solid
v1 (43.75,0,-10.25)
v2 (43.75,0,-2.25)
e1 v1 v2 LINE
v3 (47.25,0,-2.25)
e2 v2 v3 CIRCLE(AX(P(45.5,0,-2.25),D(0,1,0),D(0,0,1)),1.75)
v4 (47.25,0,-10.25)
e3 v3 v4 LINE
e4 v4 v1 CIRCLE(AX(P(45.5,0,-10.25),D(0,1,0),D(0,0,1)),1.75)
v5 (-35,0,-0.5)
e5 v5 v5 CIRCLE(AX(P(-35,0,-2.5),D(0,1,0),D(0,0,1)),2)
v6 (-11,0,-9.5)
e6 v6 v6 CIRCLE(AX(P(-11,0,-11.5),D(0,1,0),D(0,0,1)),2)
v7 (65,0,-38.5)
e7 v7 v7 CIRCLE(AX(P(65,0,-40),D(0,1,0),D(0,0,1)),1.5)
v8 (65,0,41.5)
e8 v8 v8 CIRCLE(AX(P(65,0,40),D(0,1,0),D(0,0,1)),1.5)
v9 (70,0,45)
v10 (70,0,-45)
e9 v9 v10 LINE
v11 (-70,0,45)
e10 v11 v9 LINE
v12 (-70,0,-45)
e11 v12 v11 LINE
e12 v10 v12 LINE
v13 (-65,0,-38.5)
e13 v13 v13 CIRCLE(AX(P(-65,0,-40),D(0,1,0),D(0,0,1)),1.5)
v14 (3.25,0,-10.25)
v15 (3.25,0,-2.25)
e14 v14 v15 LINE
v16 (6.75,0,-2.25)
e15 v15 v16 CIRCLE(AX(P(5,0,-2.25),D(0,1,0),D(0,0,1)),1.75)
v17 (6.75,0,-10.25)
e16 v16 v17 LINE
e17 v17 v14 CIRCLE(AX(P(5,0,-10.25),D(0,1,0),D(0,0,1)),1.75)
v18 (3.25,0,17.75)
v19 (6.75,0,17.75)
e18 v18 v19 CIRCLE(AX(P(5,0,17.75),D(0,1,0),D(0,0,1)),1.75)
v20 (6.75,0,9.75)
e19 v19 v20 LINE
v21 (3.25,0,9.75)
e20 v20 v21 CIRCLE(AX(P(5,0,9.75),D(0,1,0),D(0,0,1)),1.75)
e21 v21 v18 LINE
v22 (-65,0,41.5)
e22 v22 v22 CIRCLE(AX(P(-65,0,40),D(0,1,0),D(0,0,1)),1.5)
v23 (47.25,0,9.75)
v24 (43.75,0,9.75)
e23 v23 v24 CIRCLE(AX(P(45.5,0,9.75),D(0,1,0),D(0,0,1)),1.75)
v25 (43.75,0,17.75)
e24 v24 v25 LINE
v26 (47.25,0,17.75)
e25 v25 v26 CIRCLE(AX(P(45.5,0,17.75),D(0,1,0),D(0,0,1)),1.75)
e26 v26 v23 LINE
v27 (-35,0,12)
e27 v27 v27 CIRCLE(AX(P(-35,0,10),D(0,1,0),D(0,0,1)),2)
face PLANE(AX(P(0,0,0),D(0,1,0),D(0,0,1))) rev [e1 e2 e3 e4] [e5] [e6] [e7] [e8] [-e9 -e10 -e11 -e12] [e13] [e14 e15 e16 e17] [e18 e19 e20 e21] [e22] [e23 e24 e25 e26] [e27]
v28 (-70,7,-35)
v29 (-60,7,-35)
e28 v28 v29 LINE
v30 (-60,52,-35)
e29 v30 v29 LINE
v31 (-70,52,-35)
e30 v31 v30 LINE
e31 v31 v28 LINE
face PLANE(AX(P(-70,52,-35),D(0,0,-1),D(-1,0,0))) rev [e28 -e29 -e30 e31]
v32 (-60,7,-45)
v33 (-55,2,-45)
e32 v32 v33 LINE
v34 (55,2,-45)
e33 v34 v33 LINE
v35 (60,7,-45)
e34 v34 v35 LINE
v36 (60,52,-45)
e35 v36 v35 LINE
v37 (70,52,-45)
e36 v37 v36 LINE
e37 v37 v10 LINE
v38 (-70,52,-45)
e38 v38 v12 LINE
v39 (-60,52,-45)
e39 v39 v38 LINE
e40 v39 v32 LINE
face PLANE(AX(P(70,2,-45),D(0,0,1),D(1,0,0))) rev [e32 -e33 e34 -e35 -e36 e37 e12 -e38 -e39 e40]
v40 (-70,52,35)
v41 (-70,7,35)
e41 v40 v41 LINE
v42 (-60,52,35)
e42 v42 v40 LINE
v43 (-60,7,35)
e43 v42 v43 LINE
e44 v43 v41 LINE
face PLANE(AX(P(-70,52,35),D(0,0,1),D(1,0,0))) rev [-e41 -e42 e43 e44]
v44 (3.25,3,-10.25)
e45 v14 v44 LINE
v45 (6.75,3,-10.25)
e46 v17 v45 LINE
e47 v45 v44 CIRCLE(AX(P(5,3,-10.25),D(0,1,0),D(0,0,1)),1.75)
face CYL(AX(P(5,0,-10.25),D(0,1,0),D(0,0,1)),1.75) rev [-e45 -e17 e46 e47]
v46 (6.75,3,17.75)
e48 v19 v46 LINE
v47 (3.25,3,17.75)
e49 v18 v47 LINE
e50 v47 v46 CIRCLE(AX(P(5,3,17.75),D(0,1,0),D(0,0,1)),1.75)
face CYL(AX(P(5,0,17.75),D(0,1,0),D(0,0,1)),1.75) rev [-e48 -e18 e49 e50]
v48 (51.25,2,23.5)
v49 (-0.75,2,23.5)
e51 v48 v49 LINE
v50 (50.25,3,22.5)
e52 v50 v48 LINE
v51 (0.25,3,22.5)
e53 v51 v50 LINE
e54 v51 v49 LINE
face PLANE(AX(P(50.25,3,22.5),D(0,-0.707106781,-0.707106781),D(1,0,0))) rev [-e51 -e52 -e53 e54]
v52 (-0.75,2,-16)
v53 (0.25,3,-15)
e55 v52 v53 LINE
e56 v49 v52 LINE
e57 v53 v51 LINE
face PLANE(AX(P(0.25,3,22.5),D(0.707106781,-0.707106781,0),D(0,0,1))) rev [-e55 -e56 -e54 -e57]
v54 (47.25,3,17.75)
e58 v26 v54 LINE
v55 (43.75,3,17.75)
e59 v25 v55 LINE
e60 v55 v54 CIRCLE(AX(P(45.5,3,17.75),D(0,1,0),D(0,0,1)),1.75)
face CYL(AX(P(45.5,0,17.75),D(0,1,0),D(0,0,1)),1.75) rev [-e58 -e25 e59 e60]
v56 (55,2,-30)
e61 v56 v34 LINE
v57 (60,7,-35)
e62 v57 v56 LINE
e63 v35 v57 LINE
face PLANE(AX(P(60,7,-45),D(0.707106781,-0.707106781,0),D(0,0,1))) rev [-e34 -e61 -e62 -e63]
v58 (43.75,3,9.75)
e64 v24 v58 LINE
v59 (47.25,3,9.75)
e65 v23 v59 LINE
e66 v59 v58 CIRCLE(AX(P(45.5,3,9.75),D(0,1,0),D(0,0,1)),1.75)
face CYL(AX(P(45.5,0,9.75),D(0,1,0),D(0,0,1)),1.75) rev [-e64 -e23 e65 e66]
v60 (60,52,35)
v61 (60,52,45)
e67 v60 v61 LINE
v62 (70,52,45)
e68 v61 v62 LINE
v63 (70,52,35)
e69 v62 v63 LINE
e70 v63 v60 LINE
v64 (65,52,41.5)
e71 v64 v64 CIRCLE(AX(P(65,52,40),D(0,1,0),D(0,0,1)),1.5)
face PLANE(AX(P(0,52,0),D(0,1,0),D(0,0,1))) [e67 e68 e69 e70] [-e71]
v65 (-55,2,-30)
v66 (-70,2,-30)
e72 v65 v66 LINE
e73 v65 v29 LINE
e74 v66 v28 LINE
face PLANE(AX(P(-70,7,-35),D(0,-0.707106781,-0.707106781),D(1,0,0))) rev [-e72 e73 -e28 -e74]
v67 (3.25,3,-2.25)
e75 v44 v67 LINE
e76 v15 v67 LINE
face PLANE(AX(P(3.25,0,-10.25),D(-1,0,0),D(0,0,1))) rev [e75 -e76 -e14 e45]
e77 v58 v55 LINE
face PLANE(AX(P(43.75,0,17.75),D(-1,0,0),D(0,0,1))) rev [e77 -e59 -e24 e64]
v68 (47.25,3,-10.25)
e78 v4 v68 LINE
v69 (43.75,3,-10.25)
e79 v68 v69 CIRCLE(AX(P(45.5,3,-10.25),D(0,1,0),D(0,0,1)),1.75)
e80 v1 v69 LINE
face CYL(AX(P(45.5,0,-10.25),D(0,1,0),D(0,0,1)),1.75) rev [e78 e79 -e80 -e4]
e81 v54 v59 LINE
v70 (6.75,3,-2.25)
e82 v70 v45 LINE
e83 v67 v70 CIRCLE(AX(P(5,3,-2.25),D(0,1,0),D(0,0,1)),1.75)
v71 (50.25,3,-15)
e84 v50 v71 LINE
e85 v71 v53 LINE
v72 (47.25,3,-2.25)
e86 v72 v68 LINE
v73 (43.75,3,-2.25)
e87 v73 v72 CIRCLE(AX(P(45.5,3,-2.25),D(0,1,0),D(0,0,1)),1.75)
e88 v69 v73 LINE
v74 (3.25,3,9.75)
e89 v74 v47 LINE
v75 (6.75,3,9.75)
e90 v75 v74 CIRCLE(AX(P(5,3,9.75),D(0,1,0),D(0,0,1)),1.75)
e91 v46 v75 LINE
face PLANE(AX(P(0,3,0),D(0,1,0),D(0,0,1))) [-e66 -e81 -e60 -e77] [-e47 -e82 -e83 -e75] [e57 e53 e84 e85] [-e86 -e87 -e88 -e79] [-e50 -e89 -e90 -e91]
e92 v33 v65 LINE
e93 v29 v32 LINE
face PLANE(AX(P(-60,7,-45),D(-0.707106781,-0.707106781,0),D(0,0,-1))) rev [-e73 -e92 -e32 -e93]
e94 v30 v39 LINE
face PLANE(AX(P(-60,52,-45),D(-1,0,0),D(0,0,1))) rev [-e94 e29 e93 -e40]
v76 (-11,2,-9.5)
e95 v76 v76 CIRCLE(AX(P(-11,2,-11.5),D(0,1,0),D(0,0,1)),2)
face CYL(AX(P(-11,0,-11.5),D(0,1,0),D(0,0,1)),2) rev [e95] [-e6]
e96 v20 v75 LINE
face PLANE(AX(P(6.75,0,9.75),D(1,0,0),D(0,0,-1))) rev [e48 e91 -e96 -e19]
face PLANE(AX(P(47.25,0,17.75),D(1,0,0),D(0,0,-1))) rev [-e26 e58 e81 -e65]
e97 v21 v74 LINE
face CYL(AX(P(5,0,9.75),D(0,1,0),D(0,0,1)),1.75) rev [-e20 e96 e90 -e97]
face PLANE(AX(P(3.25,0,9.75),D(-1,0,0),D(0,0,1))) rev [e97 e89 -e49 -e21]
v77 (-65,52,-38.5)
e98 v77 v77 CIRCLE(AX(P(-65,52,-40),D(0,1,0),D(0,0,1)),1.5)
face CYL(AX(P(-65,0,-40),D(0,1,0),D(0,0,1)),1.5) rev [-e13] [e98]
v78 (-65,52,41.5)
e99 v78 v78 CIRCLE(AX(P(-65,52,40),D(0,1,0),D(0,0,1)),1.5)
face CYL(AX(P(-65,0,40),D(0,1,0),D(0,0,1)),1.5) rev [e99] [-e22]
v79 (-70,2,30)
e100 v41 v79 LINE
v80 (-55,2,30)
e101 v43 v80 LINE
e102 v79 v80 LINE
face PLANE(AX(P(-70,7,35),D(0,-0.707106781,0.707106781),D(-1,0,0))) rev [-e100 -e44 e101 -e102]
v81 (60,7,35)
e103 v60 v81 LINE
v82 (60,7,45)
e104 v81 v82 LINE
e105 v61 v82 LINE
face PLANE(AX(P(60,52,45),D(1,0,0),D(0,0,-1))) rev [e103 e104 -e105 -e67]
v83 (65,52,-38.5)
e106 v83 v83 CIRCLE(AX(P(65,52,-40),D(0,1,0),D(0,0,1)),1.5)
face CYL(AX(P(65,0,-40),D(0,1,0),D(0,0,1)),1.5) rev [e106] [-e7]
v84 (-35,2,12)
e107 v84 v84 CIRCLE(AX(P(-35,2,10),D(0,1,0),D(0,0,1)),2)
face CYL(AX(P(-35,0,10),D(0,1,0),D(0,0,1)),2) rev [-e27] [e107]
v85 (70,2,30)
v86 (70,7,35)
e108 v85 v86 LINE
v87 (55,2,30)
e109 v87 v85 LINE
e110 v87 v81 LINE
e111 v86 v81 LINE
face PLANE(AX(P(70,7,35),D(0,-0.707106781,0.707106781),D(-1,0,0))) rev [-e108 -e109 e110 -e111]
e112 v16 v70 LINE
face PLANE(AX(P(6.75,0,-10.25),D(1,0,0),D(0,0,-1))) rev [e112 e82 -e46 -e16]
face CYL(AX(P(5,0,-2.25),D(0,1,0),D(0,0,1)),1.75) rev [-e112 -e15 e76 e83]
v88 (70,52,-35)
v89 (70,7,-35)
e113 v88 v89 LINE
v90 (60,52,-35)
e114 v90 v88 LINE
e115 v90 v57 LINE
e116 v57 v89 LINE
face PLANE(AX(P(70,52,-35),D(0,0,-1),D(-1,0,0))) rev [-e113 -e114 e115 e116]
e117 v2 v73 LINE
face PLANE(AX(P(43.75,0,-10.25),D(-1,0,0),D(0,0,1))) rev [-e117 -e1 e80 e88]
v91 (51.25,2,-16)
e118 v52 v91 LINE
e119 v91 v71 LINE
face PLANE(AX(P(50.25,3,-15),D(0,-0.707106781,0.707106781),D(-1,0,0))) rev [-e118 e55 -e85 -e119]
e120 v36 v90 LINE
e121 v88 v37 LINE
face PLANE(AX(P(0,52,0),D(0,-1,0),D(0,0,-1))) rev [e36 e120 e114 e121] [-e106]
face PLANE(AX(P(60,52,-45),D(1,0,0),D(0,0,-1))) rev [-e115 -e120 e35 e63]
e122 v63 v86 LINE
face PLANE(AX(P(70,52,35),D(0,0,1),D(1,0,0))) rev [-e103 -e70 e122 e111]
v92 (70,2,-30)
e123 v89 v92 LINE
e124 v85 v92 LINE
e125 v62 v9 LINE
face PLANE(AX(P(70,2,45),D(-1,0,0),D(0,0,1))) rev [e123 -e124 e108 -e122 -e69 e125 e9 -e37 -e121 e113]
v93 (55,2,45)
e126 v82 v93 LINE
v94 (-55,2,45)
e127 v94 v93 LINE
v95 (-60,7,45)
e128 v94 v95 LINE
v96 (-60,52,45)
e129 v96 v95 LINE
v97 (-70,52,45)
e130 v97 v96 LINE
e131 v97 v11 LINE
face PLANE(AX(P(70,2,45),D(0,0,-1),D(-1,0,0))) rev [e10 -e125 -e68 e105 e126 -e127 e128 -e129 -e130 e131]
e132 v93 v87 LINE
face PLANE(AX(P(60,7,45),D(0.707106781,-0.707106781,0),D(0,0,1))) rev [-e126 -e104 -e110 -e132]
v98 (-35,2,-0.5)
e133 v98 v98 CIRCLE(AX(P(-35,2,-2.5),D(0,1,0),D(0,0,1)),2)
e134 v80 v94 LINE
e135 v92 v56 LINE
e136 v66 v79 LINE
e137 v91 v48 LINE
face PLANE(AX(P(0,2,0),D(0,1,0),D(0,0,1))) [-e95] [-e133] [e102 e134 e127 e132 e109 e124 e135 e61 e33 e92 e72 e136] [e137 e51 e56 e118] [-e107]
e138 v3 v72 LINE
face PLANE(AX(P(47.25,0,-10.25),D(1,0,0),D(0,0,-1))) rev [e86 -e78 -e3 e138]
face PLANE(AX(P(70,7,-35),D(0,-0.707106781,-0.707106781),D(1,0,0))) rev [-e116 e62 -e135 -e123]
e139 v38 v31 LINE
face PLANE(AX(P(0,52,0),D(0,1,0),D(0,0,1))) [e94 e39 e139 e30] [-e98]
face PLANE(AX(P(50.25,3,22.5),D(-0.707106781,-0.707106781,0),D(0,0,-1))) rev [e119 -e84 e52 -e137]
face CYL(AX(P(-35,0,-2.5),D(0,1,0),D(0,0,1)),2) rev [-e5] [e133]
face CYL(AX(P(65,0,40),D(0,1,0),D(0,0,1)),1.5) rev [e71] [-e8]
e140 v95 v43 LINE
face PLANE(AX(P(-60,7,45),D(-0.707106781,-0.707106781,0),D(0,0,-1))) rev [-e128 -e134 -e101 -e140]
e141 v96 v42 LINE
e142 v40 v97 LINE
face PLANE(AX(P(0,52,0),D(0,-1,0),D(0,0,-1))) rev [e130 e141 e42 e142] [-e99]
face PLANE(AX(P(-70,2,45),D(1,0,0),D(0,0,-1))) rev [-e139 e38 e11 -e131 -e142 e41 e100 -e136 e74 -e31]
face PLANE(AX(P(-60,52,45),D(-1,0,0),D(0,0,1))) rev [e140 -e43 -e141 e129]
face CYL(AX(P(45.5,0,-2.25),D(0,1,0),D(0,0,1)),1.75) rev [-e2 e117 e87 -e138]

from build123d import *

# Parameters (mm, degrees)
SKETCH1_W           = 140
SKETCH1_H           = 90
BOSS_EXTRUDE1_DEPTH = 2
SKETCH2_R           = 2
CUT_EXTRUDE1_DEPTH  = 84.240615087
SKETCH3_R           = 1.75
CUT_EXTRUDE2_DEPTH  = 84.240615087
SKETCH4_W           = 10
SKETCH4_H           = 10
BOSS_EXTRUDE2_DEPTH = 50
CHAMFER1_SIZE       = 5
SKETCH6_R           = 1.5
CUT_EXTRUDE3_DEPTH  = 99.127468122
CUT_EXTRUDE4_DEPTH  = 98.082439195
BOSS_EXTRUDE3_START = 1
SKETCH8_W           = 50
SKETCH8_H           = 37.5
BOSS_EXTRUDE3_DEPTH = 1
CHAMFER2_SIZE       = 1


with BuildPart() as part:
    # Sketch1 → Boss-Extrude1 (new body)
    with BuildSketch(Plane(origin=(0, 0, 0), x_dir=(1, 0, 0), z_dir=(0, 1, 0))):
        Rectangle(SKETCH1_W, SKETCH1_H)
    extrude(amount=BOSS_EXTRUDE1_DEPTH)

    # Sketch2 → Cut-Extrude1 (cut, through all)
    with BuildSketch(Plane(origin=(0, 2, 0), x_dir=(1, 0, 0), z_dir=(0, 1, 0))):
        with Locations(Location((-35, -10, 0), (0, 0, 270))):
            Circle(SKETCH2_R)
        with Locations(Location((-35, 2.5, 0), (0, 0, 270))):
            Circle(SKETCH2_R)
        with Locations(Location((-11, 11.5, 0), (0, 0, 270))):
            Circle(SKETCH2_R)
    extrude(amount=-CUT_EXTRUDE1_DEPTH, mode=Mode.SUBTRACT)

    # Sketch3 → Cut-Extrude2 (cut, through all)
    with BuildSketch(Plane(origin=(0, 2, 0), x_dir=(1, 0, 0), z_dir=(0, 1, 0))):
        with Locations(Location((45.5, 6.25, 0), (0, 0, 270))):
            Circle(SKETCH3_R)
        with Locations(Location((45.5, -13.75, 0), (0, 0, 270))):
            Circle(SKETCH3_R)
        with Locations(Location((5, 6.25, 0), (0, 0, 270))):
            Circle(SKETCH3_R)
        with Locations(Location((5, -13.75, 0), (0, 0, 270))):
            Circle(SKETCH3_R)
    extrude(amount=-CUT_EXTRUDE2_DEPTH, mode=Mode.SUBTRACT)

    # Sketch4 → Boss-Extrude2 (add)
    with BuildSketch(Plane(origin=(0, 2, 0), x_dir=(1, 0, 0), z_dir=(0, 1, 0))):
        with Locations((-65, 40)):
            Rectangle(SKETCH4_W, SKETCH4_H)
        with Locations((65, 40)):
            Rectangle(SKETCH4_W, SKETCH4_H)
        with Locations((65, -40)):
            Rectangle(SKETCH4_W, SKETCH4_H)
        with Locations((-65, -40)):
            Rectangle(SKETCH4_W, SKETCH4_H)
    extrude(amount=BOSS_EXTRUDE2_DEPTH)

    # Chamfer1
    chamfer1_edges = [part.edges().sort_by_distance(p)[0] for p in [
        (-65, 2, -35),
        (-60, 2, -40),
        (60, 2, -40),
        (65, 2, -35),
        (65, 2, 35),
        (60, 2, 40),
        (-60, 2, 40),
        (-65, 2, 35),
    ]]
    chamfer(chamfer1_edges, length=CHAMFER1_SIZE)

    # Sketch6 → Cut-Extrude3 (cut, through all)
    with BuildSketch(Plane(origin=(0, 52, 0), x_dir=(1, 0, 0), z_dir=(0, 1, 0))):
        with Locations(Location((-65, 40, 0), (0, 0, 270))):
            Circle(SKETCH6_R)
        with Locations(Location((65, 40, 0), (0, 0, 270))):
            Circle(SKETCH6_R)
        with Locations(Location((65, -40, 0), (0, 0, 270))):
            Circle(SKETCH6_R)
        with Locations(Location((-65, -40, 0), (0, 0, 270))):
            Circle(SKETCH6_R)
    extrude(amount=-CUT_EXTRUDE3_DEPTH, mode=Mode.SUBTRACT)

    # Sketch7 → Cut-Extrude4 (cut, through all)
    with BuildSketch(Plane(origin=(0, 2, 0), x_dir=(1, 0, 0), z_dir=(0, 1, 0))):
        with BuildLine():
            Line((6.75, 10.25), (6.75, 2.25))
            ThreePointArc((6.75, 2.25), (5, 0.5), (3.25, 2.25))
            Line((3.25, 2.25), (3.25, 10.25))
            ThreePointArc((3.25, 10.25), (5, 12), (6.75, 10.25))
        make_face()
        with BuildLine():
            Line((47.25, 10.25), (47.25, 2.25))
            ThreePointArc((47.25, 2.25), (45.5, 0.5), (43.75, 2.25))
            Line((43.75, 2.25), (43.75, 10.25))
            ThreePointArc((43.75, 10.25), (45.5, 12), (47.25, 10.25))
        make_face()
        with BuildLine():
            Line((6.75, -9.75), (6.75, -17.75))
            ThreePointArc((6.75, -17.75), (5, -19.5), (3.25, -17.75))
            Line((3.25, -17.75), (3.25, -9.75))
            ThreePointArc((3.25, -9.75), (5, -8), (6.75, -9.75))
        make_face()
        with BuildLine():
            Line((43.75, -17.75), (43.75, -9.75))
            ThreePointArc((43.75, -9.75), (45.5, -8), (47.25, -9.75))
            Line((47.25, -9.75), (47.25, -17.75))
            ThreePointArc((47.25, -17.75), (45.5, -19.5), (43.75, -17.75))
        make_face()
    extrude(amount=-CUT_EXTRUDE4_DEPTH, mode=Mode.SUBTRACT)

    # Sketch8 → Boss-Extrude3 (add)
    with BuildSketch(Plane(origin=(0, 2, 0), x_dir=(1, 0, 0), z_dir=(0, 1, 0)).offset(BOSS_EXTRUDE3_START)):
        with Locations((25.25, -3.75)):
            Rectangle(SKETCH8_W, SKETCH8_H)
        with BuildLine():
            Line((47.25, 2.25), (47.25, 10.25))
            ThreePointArc((47.25, 10.25), (45.5, 12), (43.75, 10.25))
            Line((43.75, 10.25), (43.75, 2.25))
            ThreePointArc((43.75, 2.25), (45.5, 0.5), (47.25, 2.25))
        make_face(mode=Mode.SUBTRACT)
        with BuildLine():
            Line((3.25, 10.25), (3.25, 2.25))
            ThreePointArc((3.25, 2.25), (5, 0.5), (6.75, 2.25))
            Line((6.75, 2.25), (6.75, 10.25))
            ThreePointArc((6.75, 10.25), (5, 12), (3.25, 10.25))
        make_face(mode=Mode.SUBTRACT)
        with BuildLine():
            Line((47.25, -17.75), (47.25, -9.75))
            ThreePointArc((47.25, -9.75), (45.5, -8), (43.75, -9.75))
            Line((43.75, -9.75), (43.75, -17.75))
            ThreePointArc((43.75, -17.75), (45.5, -19.5), (47.25, -17.75))
        make_face(mode=Mode.SUBTRACT)
        with BuildLine():
            Line((3.25, -9.75), (3.25, -17.75))
            ThreePointArc((3.25, -17.75), (5, -19.5), (6.75, -17.75))
            Line((6.75, -17.75), (6.75, -9.75))
            ThreePointArc((6.75, -9.75), (5, -8), (3.25, -9.75))
        make_face(mode=Mode.SUBTRACT)
    extrude(amount=-BOSS_EXTRUDE3_DEPTH)

    # Chamfer2
    chamfer2_edges = [part.edges().sort_by_distance(p)[0] for p in [
        (50.25, 2, 3.75),
        (25.25, 2, -15),
        (0.25, 2, 3.75),
        (25.25, 2, 22.5),
    ]]
    chamfer(chamfer2_edges, length=CHAMFER2_SIZE - 0.0001)  # a hair under: the kernel refuses the full size


solid = part.part
